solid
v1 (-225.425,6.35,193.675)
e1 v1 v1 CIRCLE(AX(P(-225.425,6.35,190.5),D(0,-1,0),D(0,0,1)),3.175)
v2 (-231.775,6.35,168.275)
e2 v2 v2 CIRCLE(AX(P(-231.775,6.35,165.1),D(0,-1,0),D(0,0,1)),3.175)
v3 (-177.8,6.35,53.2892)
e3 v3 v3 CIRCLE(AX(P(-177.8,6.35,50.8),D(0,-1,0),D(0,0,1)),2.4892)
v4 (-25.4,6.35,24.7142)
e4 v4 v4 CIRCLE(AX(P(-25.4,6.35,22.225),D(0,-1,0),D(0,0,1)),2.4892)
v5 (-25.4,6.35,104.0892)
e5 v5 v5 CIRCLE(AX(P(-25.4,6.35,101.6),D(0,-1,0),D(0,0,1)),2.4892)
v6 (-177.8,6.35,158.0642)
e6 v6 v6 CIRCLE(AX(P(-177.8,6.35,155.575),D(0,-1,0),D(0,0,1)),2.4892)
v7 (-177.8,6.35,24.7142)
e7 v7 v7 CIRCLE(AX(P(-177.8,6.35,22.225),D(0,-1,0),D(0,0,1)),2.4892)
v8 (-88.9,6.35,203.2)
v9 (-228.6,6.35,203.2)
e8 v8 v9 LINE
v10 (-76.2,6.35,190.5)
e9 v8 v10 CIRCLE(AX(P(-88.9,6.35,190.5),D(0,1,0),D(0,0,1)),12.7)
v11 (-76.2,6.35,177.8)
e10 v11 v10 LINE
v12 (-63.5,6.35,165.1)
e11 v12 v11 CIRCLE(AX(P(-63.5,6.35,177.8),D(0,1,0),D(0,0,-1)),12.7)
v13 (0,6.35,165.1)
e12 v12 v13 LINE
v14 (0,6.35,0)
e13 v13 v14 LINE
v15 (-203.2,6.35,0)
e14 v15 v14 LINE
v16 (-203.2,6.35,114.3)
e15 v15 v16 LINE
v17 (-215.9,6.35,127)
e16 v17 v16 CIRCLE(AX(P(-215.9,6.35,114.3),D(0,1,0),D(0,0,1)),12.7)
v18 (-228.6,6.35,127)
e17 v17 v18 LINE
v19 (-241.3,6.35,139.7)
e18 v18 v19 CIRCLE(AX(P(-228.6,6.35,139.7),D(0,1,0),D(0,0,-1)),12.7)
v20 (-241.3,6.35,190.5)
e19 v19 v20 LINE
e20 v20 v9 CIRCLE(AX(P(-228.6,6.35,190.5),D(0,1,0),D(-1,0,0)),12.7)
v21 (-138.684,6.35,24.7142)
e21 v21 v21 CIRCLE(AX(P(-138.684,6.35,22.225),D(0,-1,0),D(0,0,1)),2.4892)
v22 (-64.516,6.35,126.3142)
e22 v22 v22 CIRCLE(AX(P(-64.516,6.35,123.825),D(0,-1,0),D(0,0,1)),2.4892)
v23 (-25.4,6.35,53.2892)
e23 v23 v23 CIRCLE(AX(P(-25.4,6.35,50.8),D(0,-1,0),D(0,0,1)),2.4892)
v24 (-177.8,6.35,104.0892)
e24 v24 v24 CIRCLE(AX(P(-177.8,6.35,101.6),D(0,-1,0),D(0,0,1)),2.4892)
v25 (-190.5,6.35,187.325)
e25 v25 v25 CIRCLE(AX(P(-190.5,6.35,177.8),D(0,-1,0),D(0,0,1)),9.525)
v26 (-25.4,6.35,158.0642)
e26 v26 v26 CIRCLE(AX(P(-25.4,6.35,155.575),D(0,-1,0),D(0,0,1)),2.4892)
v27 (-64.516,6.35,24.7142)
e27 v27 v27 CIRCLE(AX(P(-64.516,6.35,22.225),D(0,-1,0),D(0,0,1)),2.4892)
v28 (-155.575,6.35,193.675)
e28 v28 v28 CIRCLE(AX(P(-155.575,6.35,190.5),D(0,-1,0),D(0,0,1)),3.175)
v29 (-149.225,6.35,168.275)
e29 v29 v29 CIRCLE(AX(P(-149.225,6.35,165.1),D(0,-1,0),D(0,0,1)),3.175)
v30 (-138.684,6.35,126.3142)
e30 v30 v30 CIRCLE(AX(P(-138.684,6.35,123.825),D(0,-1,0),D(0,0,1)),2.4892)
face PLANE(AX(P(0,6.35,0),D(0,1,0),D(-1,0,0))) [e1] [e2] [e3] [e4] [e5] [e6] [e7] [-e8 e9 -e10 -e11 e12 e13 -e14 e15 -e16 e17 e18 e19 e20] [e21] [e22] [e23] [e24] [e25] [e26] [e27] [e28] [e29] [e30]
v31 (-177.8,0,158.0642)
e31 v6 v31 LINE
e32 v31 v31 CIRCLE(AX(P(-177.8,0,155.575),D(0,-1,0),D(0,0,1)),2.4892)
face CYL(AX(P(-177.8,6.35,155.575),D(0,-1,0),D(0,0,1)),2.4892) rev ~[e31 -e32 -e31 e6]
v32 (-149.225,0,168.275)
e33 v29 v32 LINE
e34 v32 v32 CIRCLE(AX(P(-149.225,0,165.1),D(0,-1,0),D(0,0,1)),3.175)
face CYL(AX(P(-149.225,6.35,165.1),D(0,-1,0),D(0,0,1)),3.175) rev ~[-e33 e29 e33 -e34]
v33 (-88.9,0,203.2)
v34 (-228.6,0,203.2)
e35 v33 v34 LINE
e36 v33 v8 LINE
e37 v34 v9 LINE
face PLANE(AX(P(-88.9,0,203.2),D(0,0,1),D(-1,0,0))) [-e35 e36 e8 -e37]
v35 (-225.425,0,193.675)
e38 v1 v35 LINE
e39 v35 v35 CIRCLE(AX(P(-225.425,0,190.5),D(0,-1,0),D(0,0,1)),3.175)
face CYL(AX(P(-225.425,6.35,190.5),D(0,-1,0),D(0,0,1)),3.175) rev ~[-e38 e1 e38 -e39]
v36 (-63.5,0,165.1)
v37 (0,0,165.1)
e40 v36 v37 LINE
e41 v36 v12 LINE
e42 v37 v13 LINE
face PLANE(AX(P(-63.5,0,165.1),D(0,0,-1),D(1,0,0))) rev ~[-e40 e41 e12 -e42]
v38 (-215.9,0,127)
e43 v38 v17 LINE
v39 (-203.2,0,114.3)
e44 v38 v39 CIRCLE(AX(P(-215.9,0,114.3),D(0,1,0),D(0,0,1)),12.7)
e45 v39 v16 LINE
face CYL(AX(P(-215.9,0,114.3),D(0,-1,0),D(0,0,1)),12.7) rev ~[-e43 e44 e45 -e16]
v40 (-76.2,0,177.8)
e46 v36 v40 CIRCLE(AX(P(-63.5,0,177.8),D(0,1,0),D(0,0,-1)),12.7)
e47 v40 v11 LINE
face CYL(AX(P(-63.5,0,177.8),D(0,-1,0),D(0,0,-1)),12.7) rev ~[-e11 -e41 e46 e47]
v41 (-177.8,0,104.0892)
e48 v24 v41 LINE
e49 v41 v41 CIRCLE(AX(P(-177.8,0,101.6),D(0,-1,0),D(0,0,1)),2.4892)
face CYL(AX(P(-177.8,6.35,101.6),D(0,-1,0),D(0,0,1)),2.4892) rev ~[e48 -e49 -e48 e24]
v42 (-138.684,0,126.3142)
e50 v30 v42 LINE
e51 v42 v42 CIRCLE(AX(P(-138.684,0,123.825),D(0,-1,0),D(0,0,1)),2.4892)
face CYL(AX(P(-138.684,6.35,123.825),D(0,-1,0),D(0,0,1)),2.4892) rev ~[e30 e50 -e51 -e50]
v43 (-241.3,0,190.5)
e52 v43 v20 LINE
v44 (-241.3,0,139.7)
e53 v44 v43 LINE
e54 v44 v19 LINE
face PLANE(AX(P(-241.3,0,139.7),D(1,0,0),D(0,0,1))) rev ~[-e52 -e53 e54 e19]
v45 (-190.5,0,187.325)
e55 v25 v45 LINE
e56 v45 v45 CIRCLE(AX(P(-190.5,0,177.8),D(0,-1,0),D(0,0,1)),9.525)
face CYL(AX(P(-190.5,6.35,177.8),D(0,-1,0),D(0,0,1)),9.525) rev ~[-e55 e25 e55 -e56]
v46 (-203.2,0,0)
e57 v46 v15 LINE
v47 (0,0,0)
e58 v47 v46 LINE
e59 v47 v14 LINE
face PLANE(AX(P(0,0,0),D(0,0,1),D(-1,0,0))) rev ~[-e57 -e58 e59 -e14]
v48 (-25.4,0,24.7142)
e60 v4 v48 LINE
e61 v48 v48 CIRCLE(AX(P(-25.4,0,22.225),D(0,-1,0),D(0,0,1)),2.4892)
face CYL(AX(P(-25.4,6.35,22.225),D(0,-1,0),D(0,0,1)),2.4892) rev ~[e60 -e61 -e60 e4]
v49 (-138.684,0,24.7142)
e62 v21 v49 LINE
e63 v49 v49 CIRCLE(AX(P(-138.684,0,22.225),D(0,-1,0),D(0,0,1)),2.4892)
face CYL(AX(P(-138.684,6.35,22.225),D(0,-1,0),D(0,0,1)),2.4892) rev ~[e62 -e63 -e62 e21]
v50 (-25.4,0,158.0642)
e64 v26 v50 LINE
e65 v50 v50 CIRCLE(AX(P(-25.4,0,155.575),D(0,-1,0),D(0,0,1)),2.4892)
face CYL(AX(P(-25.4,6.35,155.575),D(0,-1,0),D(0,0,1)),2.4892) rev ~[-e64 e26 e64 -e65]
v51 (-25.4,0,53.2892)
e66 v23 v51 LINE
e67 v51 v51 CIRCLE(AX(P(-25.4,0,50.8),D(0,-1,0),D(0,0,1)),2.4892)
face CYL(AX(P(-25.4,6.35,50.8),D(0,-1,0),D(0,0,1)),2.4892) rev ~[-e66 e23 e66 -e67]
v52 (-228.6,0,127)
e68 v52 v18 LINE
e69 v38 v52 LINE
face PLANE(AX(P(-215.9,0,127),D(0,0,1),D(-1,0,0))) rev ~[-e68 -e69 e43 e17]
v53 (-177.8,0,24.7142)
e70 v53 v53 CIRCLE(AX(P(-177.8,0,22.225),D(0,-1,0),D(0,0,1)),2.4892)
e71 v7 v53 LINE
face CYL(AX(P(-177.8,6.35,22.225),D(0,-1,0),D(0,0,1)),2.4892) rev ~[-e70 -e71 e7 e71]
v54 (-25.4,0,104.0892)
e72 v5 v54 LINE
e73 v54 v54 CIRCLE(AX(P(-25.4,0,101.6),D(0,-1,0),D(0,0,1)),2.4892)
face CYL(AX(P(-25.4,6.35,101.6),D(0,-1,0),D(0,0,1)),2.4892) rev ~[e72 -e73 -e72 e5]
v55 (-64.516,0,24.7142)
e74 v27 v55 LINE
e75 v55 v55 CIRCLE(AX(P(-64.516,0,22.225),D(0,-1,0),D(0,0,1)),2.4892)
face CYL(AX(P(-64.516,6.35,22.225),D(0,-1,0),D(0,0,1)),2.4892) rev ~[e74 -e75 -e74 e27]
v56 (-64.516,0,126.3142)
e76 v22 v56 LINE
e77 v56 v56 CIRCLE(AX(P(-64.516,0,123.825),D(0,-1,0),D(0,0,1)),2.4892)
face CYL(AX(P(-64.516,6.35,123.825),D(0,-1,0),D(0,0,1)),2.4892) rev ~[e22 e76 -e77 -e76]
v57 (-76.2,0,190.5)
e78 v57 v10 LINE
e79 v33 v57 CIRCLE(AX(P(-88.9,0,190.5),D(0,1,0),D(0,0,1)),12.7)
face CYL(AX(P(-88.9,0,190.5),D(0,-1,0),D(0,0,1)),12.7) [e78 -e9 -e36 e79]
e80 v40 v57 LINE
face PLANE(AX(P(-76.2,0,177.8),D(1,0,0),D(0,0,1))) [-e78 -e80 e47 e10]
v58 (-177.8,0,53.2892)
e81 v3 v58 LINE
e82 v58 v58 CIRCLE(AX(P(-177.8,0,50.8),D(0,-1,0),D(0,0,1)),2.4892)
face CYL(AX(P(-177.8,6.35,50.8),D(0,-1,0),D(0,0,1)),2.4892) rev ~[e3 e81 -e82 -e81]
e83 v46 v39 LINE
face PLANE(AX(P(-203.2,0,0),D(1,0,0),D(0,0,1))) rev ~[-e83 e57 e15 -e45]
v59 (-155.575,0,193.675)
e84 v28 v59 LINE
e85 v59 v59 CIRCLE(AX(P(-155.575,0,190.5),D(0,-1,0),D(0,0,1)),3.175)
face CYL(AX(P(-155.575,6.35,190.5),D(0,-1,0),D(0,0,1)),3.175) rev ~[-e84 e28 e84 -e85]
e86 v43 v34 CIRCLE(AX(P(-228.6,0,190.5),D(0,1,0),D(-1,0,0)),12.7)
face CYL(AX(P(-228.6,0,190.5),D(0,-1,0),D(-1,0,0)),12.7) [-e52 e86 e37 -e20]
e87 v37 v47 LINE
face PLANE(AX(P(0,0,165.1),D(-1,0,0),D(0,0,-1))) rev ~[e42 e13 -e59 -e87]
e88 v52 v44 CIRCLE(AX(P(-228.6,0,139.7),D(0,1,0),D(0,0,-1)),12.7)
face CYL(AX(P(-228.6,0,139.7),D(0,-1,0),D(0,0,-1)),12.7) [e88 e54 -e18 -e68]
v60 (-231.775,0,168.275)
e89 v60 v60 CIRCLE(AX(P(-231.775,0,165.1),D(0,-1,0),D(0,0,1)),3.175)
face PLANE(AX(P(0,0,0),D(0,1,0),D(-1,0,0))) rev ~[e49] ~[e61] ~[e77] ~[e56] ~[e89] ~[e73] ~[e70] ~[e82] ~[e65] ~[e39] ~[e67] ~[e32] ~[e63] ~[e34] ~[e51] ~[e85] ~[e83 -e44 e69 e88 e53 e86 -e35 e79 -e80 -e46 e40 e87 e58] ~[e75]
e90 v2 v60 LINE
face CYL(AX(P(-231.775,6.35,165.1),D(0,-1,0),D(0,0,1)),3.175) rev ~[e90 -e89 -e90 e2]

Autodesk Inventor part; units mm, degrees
ref_plane "YZ Plane" through (0, 0, 0) normal (1, 0, 0) x (0, 1, 0)
ref_plane "XZ Plane" through (0, 0, 0) normal (0, 1, 0) x (-1, 0, 0)
ref_plane "XY Plane" through (0, 0, 0) normal (0, 0, 1) x (1, 0, 0)
sketch "Sketch1" plane through (0, 0, 0) normal (0, 1, 0) x (-1, 0, 0)
  line L0 (0, 0) -> (203.2, 0)
  line L1 (203.2, 0) -> (203.2, 114.3)
  line L2 (76.2, 165.1) -> (0, 165.1)
  line L3 (0, 165.1) -> (0, 0)
  line L4 (76.2, 165.1) -> (76.2, 190.5)
  line L5 (88.9, 203.2) -> (228.6, 203.2)
  arc A0 (63.5, 165.1) -> (76.2, 177.8) centre (63.5, 177.8) ccw
  arc A1 (241.3, 190.5) -> (228.6, 203.2) centre (228.6, 190.5) ccw
  arc A2 (88.9, 203.2) -> (76.2, 190.5) centre (88.9, 190.5) ccw
  line L6 (146.05, 0) -> (57.15, 0)
  line L7 (215.9, 127) -> (228.6, 127)
  line L8 (241.3, 139.7) -> (241.3, 190.5)
  arc A3 (215.9, 127) -> (203.2, 114.3) centre (215.9, 114.3) ccw
  arc A4 (228.6, 127) -> (241.3, 139.7) centre (228.6, 139.7) ccw
  point P0 (76.2, 203.2)
  point P1 (241.3, 127)
  dimension "d64" = 38.1
  dimension "d67" = 12.7
  dimension "d69" = 12.7
  dimension "d105" = 76.2
  dimension "d106" = 12.7
  dimension "d108" = 203.2
  dimension "d109" = 127
  dimension "d110" = 165.1
  dimension "d111" = 38.1
extrude "Plate2" add sketch "Sketch1" along normal blind 6.35
sketch "Sketch5" plane through (0, 6.35, 0) normal (0, 1, 0) x (1, 0, 0)
  line L0 (-203.2, -114.3) -> (-203.2, 0) projected
  line L1 (0, 0) -> (0, -165.1) projected
  line L2 (-203.2, 0) -> (0, 0) projected
  point P0 (-203.2, -165.1)
  point P1 (-177.8, -22.225)
  point P2 (-25.4, -22.225)
  point P3 (-25.4, -155.575)
  point P4 (-177.8, -155.575)
  point P5 (-177.8, -50.8)
  point P6 (-177.8, -101.6)
  point P7 (-25.4, -50.8)
  point P8 (-25.4, -101.6)
  point P9 (-203.2, -203.2)
  point P10 (-138.684, -22.225)
  point P11 (-64.516, -22.225)
  point P12 (-138.684, -123.825)
  point P13 (-64.516, -123.825)
  dimension "d27" = 25.4
  dimension "d28" = 25.4
  dimension "d30" = 133.35
  dimension "d62" = 22.225
  dimension "d89" = 50.8
  dimension "d90" = 50.8
  dimension "d91" = 25.4
  dimension "d93" = 152.4
  dimension "d94" = 25.4
  dimension "d147" = 64.516
  dimension "d148" = 64.516
  dimension "d149" = 101.6
hole "Hole2" at (-177.8, 6.35, 22.225) at (-25.4, 6.35, 22.225) at (-25.4, 6.35, 155.575) at (-177.8, 6.35, 155.575) at (-177.8, 6.35, 101.6) at (-177.8, 6.35, 50.8) at (-25.4, 6.35, 50.8) at (-25.4, 6.35, 101.6) at (-64.516, 6.35, 123.825) at (-138.684, 6.35, 123.825) at (-138.684, 6.35, 22.225) at (-64.516, 6.35, 22.225) direction (0, -1, 0) diameter 4.9784 end through all thread size "1/4-20 UNC" class "2B" standard "ANSI Unified Screw Threads"
sketch "Sketch12" plane through (0, 6.35, 0) normal (0, 1, 0) x (1, 0, 0)
  line L0 (-241.3, -190.5) -> (-241.3, -139.7) projected
  line L1 (-228.6, -127) -> (-215.9, -127) projected
  point P0 (-203.2, -203.2)
  point P1 (-190.5, -177.8)
  dimension "d107" = 50.8
  dimension "d129" = 50.8
hole "Hole3" at (-190.5, 6.35, 177.8) direction (0, -1, 0) diameter 19.05 end through all
sketch "Sketch14" plane through (0, 6.35, 0) normal (0, 1, 0) x (1, 0, 0)
  circle A0 centre (-190.5, -177.8) radius 9.525 projected
  point P0 (0, 0)
  point P1 (-225.425, -190.5)
  point P2 (-155.575, -190.5)
  point P3 (-149.225, -165.1)
  point P4 (-231.775, -165.1)
  dimension "d130" = 6.35
  dimension "d135" = 6.35
  dimension "d136" = 25.4
  dimension "d137" = 12.7
  dimension "d138" = 82.55
  dimension "d139" = 41.275
hole "Hole5" at (-225.425, 6.35, 190.5) at (-155.575, 6.35, 190.5) at (-149.225, 6.35, 165.1) at (-231.775, 6.35, 165.1) direction (0, -1, 0) diameter 6.35 end through all
equation "\"d91\" = d94"
equation "\"d148\" = d147"
equation "\"d102\" = Thickness"
equation "\"d135\" = d130"
equation "\"d139\" = 0.5 * d138"
equation "\"d145\" = Thickness"
equation "\"d106\" = d69"
equation "\"BendRadius\" = Thickness"
equation "\"BendReliefWidth\" = Thickness"
equation "\"BendReliefDepth\" = 0.5 * Thickness"
equation "\"CornerReliefSize\" = 4 * Thickness"
equation "\"MinimumRemnant\" = 2 * Thickness"
equation "\"TransitionRadius\" = BendRadius"
equation "\"JacobiRadiusSize\" = Thickness"
equation "\"GapSize\" = Thickness"
equation "\"d15\" = BendRadius"
equation "\"d16\" = BendRadius"
equation "\"Thickness\" = 6.35"
properties part number "backplate"
